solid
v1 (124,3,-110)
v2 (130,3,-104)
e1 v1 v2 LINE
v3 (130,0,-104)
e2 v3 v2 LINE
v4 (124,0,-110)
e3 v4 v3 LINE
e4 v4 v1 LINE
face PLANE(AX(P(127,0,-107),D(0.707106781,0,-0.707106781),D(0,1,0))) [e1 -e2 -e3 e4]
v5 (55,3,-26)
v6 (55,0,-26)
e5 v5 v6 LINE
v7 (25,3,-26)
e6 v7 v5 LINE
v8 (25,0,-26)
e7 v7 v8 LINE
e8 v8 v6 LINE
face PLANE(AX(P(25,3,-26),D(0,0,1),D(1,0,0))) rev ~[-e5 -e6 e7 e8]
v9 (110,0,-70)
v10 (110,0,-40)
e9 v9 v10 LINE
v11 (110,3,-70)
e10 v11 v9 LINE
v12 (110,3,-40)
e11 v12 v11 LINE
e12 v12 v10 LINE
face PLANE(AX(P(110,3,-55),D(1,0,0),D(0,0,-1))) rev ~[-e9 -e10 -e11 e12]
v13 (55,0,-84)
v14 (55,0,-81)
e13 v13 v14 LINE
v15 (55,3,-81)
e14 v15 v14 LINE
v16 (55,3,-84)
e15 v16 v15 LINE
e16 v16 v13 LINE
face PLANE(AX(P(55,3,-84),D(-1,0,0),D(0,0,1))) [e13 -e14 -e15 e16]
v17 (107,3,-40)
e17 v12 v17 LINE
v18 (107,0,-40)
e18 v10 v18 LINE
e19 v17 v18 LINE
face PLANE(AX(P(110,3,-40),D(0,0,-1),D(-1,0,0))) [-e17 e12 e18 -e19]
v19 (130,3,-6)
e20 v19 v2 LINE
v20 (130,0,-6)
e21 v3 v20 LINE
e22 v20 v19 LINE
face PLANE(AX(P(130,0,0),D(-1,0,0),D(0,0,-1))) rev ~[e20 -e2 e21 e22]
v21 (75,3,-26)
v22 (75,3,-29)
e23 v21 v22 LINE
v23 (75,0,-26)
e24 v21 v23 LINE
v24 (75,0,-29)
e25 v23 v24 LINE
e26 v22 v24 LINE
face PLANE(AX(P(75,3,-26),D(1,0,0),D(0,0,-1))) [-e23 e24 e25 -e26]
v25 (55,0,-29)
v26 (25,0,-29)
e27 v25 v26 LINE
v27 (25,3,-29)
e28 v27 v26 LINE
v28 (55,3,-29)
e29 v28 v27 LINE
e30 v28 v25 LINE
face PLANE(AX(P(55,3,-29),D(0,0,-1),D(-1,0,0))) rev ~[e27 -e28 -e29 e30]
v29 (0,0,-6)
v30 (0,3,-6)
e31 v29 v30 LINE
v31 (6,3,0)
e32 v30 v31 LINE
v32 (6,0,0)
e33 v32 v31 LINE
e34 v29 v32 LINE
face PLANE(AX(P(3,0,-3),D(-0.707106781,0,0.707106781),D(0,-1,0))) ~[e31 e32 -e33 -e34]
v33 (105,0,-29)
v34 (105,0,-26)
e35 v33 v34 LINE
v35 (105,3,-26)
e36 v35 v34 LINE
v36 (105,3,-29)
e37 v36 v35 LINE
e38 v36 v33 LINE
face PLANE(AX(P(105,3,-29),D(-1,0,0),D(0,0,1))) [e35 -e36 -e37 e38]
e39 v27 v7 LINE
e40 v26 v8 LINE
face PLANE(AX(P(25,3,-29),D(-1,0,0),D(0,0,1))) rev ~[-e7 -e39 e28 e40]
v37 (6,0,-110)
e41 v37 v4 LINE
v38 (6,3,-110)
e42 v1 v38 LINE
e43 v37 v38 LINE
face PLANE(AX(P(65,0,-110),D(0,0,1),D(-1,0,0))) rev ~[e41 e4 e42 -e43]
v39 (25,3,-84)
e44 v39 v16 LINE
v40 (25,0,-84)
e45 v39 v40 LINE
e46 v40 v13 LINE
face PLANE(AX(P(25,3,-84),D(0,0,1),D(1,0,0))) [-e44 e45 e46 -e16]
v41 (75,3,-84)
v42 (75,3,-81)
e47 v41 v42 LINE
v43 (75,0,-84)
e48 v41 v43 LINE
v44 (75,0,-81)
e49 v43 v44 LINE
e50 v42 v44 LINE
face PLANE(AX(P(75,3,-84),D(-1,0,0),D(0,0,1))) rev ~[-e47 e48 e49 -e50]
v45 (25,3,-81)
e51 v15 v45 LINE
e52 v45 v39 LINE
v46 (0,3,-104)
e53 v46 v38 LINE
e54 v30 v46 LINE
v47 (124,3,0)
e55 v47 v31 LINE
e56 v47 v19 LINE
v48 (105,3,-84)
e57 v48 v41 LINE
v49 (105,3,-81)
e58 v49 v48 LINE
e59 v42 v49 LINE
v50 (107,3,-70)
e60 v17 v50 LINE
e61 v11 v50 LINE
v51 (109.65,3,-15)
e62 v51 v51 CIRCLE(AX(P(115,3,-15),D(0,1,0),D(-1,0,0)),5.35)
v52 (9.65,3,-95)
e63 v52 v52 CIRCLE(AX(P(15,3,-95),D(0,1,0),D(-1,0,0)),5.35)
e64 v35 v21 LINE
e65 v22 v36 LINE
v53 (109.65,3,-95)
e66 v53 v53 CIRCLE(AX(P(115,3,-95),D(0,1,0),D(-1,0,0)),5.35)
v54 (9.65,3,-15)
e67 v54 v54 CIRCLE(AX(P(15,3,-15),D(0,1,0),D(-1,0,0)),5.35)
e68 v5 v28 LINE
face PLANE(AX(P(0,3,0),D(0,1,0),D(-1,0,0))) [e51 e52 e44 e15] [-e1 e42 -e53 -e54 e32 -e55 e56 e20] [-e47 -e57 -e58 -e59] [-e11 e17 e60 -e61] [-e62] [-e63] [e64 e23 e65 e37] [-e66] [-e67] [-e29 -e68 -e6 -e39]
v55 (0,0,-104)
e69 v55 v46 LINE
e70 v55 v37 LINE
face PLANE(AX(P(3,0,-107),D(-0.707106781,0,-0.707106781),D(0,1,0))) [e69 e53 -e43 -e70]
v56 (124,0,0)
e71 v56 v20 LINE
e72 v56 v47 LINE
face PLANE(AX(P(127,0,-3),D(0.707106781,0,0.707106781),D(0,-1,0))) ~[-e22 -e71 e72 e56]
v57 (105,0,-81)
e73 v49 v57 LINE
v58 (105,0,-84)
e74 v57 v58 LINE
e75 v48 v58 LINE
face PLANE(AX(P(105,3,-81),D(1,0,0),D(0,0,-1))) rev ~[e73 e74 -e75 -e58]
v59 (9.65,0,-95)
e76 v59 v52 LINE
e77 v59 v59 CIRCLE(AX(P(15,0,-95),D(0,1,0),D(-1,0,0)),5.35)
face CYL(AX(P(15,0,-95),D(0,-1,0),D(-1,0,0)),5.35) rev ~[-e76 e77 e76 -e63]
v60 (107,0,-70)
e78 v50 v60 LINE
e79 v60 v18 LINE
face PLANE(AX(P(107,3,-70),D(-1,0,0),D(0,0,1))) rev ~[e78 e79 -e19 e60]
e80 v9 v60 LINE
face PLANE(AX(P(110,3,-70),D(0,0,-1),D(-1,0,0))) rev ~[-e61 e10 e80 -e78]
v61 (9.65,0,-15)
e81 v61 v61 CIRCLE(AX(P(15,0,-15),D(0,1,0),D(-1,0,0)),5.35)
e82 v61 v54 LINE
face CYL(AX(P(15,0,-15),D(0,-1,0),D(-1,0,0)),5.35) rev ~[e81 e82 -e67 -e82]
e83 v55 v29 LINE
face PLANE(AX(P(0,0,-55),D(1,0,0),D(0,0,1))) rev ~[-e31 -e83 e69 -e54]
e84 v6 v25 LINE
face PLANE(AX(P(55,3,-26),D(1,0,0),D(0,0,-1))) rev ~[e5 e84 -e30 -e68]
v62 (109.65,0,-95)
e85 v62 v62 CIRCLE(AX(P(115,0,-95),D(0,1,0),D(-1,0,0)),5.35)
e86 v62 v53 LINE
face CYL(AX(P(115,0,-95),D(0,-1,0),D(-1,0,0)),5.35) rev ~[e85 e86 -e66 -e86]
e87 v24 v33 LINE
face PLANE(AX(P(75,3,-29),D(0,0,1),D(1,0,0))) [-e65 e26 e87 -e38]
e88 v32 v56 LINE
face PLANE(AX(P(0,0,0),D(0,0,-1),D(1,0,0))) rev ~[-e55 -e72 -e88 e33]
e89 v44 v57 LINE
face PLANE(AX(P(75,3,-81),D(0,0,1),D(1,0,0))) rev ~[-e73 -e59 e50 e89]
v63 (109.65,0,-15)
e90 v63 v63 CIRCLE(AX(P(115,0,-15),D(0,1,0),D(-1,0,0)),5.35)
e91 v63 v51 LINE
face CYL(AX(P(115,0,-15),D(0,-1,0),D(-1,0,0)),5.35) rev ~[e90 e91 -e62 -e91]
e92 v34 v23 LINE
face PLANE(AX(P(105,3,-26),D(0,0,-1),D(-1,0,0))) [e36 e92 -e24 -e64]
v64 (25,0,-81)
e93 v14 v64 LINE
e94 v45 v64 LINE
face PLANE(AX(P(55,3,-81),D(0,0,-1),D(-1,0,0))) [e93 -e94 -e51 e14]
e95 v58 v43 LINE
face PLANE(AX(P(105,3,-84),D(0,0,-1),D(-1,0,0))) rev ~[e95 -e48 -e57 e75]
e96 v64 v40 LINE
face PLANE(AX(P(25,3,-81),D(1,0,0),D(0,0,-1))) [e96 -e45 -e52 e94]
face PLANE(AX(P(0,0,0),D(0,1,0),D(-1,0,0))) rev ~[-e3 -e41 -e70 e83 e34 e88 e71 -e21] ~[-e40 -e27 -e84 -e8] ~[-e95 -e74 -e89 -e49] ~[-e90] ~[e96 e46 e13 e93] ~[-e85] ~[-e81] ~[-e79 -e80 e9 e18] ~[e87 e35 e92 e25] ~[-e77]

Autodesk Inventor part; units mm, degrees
ref_plane "YZ Plane" through (0, 0, 0) normal (1, 0, 0) x (0, 1, 0)
ref_plane "XZ Plane" through (0, 0, 0) normal (0, 1, 0) x (-1, 0, 0)
ref_plane "XY Plane" through (0, 0, 0) normal (0, 0, 1) x (1, 0, 0)
sketch "Sketch1" plane through (0, 0, 0) normal (0, 1, 0) x (-1, 0, 0)
  line L0 (0, 0) -> (-130, 0)
  line L1 (-130, 0) -> (-130, -110)
  line L2 (-130, -110) -> (0, -110)
  line L3 (0, -110) -> (0, 0)
  circle A0 centre (-15, -95) radius 5.35
  line L4 (-65, -110) -> (-65, 0)
  line L5 (0, -55) -> (-130, -55)
  circle A1 centre (-115, -95) radius 5.35
  circle A2 centre (-15, -15) radius 5.35
  circle A3 centre (-115, -15) radius 5.35
  dimension "d0" = 130
  dimension "d1" = 110
  dimension "d2" = 10.7
  dimension "d3" = 50
  dimension "d4" = 40
extrude "Plate1" add sketch "Sketch1" along normal blind 3
sketch "Sketch2" plane through (0, 3, 0) normal (0, 1, 0) x (1, 0, 0)
  line L0 (0, 110) -> (0, 0) projected
  line L1 (0, 55) -> (130, 55)
  line L2 (130, 0) -> (130, 110) projected
  line L3 (25, 84) -> (55, 84)
  line L4 (55, 84) -> (55, 81)
  line L5 (55, 81) -> (25, 81)
  line L6 (25, 81) -> (25, 84)
  line L7 (75, 81) -> (105, 81)
  line L8 (105, 81) -> (105, 84)
  line L9 (105, 84) -> (75, 84)
  line L10 (75, 84) -> (75, 81)
  line L11 (107, 55) -> (110, 55)
  line L12 (110, 55) -> (110, 70)
  line L13 (110, 70) -> (107, 70)
  line L14 (107, 70) -> (107, 55)
  line L15 (25, 26) -> (55, 26)
  line L16 (55, 26) -> (55, 29)
  line L17 (55, 29) -> (25, 29)
  line L18 (25, 29) -> (25, 26)
  line L19 (75, 29) -> (105, 29)
  line L20 (105, 29) -> (105, 26)
  line L21 (105, 26) -> (75, 26)
  line L22 (75, 26) -> (75, 29)
  line L23 (110, 55) -> (110, 40)
  line L24 (110, 40) -> (107, 40)
  line L25 (107, 40) -> (107, 55)
  point P0 (75, 82.5)
  point P1 (55, 82.5)
  dimension "d6" = 3
  dimension "d7" = 30
  dimension "d8" = 30
  dimension "d9" = 3
  dimension "d10" = 3
  dimension "d11" = 15
  dimension "d12" = 20
  dimension "d13" = 25
  dimension "d14" = 20
  dimension "d15" = 26
extrude "Cut1" cut sketch "Sketch2" against normal blind 3
chamfer "Corner Chamfer1" distance 6 angle 45 4 edges at (130, 1.5, 0) (0, 1.5, 0) (0, 1.5, -110) (130, 1.5, -110)
equation "\"d6\" = plate_thickness"
equation "\"d9\" = plate_thickness"
equation "\"d10\" = plate_thickness"
equation "\"d16\" = Thickness"
equation "\"d5\" = Thickness"
equation "\"Thickness\" = plate_thickness"
equation "\"BendRadius\" = Thickness"
equation "\"BendReliefWidth\" = Thickness"
equation "\"BendReliefDepth\" = 0.5 * Thickness"
equation "\"CornerReliefSize\" = 4 * Thickness"
equation "\"MinimumRemnant\" = 2 * Thickness"
equation "\"TransitionRadius\" = BendRadius"
equation "\"JacobiRadiusSize\" = BendRadius"
equation "\"GapSize\" = Thickness"
equation "\"A_width\" = 46"
equation "\"A_joint_diameter\" = 16"
equation "\"l___________\" = 0"
equation "\"l__________\" = 0"
equation "\"l_________\" = 0"
equation "\"rivet_diameter\" = 3.35"
equation "\"plate_thickness\" = 3"
equation "\"l________\" = 0"
equation "\"A_joint_tolerance\" = 3"
equation "\"A_B_spacing\" = 2"
equation "\"L_Piston_Bottom\" = 21"
equation "\"L_Piston_Top\" = 25"
equation "\"thin_plate\" = 1.5"
properties part number "bottom_hinge_001" material "Stainless Steel"
